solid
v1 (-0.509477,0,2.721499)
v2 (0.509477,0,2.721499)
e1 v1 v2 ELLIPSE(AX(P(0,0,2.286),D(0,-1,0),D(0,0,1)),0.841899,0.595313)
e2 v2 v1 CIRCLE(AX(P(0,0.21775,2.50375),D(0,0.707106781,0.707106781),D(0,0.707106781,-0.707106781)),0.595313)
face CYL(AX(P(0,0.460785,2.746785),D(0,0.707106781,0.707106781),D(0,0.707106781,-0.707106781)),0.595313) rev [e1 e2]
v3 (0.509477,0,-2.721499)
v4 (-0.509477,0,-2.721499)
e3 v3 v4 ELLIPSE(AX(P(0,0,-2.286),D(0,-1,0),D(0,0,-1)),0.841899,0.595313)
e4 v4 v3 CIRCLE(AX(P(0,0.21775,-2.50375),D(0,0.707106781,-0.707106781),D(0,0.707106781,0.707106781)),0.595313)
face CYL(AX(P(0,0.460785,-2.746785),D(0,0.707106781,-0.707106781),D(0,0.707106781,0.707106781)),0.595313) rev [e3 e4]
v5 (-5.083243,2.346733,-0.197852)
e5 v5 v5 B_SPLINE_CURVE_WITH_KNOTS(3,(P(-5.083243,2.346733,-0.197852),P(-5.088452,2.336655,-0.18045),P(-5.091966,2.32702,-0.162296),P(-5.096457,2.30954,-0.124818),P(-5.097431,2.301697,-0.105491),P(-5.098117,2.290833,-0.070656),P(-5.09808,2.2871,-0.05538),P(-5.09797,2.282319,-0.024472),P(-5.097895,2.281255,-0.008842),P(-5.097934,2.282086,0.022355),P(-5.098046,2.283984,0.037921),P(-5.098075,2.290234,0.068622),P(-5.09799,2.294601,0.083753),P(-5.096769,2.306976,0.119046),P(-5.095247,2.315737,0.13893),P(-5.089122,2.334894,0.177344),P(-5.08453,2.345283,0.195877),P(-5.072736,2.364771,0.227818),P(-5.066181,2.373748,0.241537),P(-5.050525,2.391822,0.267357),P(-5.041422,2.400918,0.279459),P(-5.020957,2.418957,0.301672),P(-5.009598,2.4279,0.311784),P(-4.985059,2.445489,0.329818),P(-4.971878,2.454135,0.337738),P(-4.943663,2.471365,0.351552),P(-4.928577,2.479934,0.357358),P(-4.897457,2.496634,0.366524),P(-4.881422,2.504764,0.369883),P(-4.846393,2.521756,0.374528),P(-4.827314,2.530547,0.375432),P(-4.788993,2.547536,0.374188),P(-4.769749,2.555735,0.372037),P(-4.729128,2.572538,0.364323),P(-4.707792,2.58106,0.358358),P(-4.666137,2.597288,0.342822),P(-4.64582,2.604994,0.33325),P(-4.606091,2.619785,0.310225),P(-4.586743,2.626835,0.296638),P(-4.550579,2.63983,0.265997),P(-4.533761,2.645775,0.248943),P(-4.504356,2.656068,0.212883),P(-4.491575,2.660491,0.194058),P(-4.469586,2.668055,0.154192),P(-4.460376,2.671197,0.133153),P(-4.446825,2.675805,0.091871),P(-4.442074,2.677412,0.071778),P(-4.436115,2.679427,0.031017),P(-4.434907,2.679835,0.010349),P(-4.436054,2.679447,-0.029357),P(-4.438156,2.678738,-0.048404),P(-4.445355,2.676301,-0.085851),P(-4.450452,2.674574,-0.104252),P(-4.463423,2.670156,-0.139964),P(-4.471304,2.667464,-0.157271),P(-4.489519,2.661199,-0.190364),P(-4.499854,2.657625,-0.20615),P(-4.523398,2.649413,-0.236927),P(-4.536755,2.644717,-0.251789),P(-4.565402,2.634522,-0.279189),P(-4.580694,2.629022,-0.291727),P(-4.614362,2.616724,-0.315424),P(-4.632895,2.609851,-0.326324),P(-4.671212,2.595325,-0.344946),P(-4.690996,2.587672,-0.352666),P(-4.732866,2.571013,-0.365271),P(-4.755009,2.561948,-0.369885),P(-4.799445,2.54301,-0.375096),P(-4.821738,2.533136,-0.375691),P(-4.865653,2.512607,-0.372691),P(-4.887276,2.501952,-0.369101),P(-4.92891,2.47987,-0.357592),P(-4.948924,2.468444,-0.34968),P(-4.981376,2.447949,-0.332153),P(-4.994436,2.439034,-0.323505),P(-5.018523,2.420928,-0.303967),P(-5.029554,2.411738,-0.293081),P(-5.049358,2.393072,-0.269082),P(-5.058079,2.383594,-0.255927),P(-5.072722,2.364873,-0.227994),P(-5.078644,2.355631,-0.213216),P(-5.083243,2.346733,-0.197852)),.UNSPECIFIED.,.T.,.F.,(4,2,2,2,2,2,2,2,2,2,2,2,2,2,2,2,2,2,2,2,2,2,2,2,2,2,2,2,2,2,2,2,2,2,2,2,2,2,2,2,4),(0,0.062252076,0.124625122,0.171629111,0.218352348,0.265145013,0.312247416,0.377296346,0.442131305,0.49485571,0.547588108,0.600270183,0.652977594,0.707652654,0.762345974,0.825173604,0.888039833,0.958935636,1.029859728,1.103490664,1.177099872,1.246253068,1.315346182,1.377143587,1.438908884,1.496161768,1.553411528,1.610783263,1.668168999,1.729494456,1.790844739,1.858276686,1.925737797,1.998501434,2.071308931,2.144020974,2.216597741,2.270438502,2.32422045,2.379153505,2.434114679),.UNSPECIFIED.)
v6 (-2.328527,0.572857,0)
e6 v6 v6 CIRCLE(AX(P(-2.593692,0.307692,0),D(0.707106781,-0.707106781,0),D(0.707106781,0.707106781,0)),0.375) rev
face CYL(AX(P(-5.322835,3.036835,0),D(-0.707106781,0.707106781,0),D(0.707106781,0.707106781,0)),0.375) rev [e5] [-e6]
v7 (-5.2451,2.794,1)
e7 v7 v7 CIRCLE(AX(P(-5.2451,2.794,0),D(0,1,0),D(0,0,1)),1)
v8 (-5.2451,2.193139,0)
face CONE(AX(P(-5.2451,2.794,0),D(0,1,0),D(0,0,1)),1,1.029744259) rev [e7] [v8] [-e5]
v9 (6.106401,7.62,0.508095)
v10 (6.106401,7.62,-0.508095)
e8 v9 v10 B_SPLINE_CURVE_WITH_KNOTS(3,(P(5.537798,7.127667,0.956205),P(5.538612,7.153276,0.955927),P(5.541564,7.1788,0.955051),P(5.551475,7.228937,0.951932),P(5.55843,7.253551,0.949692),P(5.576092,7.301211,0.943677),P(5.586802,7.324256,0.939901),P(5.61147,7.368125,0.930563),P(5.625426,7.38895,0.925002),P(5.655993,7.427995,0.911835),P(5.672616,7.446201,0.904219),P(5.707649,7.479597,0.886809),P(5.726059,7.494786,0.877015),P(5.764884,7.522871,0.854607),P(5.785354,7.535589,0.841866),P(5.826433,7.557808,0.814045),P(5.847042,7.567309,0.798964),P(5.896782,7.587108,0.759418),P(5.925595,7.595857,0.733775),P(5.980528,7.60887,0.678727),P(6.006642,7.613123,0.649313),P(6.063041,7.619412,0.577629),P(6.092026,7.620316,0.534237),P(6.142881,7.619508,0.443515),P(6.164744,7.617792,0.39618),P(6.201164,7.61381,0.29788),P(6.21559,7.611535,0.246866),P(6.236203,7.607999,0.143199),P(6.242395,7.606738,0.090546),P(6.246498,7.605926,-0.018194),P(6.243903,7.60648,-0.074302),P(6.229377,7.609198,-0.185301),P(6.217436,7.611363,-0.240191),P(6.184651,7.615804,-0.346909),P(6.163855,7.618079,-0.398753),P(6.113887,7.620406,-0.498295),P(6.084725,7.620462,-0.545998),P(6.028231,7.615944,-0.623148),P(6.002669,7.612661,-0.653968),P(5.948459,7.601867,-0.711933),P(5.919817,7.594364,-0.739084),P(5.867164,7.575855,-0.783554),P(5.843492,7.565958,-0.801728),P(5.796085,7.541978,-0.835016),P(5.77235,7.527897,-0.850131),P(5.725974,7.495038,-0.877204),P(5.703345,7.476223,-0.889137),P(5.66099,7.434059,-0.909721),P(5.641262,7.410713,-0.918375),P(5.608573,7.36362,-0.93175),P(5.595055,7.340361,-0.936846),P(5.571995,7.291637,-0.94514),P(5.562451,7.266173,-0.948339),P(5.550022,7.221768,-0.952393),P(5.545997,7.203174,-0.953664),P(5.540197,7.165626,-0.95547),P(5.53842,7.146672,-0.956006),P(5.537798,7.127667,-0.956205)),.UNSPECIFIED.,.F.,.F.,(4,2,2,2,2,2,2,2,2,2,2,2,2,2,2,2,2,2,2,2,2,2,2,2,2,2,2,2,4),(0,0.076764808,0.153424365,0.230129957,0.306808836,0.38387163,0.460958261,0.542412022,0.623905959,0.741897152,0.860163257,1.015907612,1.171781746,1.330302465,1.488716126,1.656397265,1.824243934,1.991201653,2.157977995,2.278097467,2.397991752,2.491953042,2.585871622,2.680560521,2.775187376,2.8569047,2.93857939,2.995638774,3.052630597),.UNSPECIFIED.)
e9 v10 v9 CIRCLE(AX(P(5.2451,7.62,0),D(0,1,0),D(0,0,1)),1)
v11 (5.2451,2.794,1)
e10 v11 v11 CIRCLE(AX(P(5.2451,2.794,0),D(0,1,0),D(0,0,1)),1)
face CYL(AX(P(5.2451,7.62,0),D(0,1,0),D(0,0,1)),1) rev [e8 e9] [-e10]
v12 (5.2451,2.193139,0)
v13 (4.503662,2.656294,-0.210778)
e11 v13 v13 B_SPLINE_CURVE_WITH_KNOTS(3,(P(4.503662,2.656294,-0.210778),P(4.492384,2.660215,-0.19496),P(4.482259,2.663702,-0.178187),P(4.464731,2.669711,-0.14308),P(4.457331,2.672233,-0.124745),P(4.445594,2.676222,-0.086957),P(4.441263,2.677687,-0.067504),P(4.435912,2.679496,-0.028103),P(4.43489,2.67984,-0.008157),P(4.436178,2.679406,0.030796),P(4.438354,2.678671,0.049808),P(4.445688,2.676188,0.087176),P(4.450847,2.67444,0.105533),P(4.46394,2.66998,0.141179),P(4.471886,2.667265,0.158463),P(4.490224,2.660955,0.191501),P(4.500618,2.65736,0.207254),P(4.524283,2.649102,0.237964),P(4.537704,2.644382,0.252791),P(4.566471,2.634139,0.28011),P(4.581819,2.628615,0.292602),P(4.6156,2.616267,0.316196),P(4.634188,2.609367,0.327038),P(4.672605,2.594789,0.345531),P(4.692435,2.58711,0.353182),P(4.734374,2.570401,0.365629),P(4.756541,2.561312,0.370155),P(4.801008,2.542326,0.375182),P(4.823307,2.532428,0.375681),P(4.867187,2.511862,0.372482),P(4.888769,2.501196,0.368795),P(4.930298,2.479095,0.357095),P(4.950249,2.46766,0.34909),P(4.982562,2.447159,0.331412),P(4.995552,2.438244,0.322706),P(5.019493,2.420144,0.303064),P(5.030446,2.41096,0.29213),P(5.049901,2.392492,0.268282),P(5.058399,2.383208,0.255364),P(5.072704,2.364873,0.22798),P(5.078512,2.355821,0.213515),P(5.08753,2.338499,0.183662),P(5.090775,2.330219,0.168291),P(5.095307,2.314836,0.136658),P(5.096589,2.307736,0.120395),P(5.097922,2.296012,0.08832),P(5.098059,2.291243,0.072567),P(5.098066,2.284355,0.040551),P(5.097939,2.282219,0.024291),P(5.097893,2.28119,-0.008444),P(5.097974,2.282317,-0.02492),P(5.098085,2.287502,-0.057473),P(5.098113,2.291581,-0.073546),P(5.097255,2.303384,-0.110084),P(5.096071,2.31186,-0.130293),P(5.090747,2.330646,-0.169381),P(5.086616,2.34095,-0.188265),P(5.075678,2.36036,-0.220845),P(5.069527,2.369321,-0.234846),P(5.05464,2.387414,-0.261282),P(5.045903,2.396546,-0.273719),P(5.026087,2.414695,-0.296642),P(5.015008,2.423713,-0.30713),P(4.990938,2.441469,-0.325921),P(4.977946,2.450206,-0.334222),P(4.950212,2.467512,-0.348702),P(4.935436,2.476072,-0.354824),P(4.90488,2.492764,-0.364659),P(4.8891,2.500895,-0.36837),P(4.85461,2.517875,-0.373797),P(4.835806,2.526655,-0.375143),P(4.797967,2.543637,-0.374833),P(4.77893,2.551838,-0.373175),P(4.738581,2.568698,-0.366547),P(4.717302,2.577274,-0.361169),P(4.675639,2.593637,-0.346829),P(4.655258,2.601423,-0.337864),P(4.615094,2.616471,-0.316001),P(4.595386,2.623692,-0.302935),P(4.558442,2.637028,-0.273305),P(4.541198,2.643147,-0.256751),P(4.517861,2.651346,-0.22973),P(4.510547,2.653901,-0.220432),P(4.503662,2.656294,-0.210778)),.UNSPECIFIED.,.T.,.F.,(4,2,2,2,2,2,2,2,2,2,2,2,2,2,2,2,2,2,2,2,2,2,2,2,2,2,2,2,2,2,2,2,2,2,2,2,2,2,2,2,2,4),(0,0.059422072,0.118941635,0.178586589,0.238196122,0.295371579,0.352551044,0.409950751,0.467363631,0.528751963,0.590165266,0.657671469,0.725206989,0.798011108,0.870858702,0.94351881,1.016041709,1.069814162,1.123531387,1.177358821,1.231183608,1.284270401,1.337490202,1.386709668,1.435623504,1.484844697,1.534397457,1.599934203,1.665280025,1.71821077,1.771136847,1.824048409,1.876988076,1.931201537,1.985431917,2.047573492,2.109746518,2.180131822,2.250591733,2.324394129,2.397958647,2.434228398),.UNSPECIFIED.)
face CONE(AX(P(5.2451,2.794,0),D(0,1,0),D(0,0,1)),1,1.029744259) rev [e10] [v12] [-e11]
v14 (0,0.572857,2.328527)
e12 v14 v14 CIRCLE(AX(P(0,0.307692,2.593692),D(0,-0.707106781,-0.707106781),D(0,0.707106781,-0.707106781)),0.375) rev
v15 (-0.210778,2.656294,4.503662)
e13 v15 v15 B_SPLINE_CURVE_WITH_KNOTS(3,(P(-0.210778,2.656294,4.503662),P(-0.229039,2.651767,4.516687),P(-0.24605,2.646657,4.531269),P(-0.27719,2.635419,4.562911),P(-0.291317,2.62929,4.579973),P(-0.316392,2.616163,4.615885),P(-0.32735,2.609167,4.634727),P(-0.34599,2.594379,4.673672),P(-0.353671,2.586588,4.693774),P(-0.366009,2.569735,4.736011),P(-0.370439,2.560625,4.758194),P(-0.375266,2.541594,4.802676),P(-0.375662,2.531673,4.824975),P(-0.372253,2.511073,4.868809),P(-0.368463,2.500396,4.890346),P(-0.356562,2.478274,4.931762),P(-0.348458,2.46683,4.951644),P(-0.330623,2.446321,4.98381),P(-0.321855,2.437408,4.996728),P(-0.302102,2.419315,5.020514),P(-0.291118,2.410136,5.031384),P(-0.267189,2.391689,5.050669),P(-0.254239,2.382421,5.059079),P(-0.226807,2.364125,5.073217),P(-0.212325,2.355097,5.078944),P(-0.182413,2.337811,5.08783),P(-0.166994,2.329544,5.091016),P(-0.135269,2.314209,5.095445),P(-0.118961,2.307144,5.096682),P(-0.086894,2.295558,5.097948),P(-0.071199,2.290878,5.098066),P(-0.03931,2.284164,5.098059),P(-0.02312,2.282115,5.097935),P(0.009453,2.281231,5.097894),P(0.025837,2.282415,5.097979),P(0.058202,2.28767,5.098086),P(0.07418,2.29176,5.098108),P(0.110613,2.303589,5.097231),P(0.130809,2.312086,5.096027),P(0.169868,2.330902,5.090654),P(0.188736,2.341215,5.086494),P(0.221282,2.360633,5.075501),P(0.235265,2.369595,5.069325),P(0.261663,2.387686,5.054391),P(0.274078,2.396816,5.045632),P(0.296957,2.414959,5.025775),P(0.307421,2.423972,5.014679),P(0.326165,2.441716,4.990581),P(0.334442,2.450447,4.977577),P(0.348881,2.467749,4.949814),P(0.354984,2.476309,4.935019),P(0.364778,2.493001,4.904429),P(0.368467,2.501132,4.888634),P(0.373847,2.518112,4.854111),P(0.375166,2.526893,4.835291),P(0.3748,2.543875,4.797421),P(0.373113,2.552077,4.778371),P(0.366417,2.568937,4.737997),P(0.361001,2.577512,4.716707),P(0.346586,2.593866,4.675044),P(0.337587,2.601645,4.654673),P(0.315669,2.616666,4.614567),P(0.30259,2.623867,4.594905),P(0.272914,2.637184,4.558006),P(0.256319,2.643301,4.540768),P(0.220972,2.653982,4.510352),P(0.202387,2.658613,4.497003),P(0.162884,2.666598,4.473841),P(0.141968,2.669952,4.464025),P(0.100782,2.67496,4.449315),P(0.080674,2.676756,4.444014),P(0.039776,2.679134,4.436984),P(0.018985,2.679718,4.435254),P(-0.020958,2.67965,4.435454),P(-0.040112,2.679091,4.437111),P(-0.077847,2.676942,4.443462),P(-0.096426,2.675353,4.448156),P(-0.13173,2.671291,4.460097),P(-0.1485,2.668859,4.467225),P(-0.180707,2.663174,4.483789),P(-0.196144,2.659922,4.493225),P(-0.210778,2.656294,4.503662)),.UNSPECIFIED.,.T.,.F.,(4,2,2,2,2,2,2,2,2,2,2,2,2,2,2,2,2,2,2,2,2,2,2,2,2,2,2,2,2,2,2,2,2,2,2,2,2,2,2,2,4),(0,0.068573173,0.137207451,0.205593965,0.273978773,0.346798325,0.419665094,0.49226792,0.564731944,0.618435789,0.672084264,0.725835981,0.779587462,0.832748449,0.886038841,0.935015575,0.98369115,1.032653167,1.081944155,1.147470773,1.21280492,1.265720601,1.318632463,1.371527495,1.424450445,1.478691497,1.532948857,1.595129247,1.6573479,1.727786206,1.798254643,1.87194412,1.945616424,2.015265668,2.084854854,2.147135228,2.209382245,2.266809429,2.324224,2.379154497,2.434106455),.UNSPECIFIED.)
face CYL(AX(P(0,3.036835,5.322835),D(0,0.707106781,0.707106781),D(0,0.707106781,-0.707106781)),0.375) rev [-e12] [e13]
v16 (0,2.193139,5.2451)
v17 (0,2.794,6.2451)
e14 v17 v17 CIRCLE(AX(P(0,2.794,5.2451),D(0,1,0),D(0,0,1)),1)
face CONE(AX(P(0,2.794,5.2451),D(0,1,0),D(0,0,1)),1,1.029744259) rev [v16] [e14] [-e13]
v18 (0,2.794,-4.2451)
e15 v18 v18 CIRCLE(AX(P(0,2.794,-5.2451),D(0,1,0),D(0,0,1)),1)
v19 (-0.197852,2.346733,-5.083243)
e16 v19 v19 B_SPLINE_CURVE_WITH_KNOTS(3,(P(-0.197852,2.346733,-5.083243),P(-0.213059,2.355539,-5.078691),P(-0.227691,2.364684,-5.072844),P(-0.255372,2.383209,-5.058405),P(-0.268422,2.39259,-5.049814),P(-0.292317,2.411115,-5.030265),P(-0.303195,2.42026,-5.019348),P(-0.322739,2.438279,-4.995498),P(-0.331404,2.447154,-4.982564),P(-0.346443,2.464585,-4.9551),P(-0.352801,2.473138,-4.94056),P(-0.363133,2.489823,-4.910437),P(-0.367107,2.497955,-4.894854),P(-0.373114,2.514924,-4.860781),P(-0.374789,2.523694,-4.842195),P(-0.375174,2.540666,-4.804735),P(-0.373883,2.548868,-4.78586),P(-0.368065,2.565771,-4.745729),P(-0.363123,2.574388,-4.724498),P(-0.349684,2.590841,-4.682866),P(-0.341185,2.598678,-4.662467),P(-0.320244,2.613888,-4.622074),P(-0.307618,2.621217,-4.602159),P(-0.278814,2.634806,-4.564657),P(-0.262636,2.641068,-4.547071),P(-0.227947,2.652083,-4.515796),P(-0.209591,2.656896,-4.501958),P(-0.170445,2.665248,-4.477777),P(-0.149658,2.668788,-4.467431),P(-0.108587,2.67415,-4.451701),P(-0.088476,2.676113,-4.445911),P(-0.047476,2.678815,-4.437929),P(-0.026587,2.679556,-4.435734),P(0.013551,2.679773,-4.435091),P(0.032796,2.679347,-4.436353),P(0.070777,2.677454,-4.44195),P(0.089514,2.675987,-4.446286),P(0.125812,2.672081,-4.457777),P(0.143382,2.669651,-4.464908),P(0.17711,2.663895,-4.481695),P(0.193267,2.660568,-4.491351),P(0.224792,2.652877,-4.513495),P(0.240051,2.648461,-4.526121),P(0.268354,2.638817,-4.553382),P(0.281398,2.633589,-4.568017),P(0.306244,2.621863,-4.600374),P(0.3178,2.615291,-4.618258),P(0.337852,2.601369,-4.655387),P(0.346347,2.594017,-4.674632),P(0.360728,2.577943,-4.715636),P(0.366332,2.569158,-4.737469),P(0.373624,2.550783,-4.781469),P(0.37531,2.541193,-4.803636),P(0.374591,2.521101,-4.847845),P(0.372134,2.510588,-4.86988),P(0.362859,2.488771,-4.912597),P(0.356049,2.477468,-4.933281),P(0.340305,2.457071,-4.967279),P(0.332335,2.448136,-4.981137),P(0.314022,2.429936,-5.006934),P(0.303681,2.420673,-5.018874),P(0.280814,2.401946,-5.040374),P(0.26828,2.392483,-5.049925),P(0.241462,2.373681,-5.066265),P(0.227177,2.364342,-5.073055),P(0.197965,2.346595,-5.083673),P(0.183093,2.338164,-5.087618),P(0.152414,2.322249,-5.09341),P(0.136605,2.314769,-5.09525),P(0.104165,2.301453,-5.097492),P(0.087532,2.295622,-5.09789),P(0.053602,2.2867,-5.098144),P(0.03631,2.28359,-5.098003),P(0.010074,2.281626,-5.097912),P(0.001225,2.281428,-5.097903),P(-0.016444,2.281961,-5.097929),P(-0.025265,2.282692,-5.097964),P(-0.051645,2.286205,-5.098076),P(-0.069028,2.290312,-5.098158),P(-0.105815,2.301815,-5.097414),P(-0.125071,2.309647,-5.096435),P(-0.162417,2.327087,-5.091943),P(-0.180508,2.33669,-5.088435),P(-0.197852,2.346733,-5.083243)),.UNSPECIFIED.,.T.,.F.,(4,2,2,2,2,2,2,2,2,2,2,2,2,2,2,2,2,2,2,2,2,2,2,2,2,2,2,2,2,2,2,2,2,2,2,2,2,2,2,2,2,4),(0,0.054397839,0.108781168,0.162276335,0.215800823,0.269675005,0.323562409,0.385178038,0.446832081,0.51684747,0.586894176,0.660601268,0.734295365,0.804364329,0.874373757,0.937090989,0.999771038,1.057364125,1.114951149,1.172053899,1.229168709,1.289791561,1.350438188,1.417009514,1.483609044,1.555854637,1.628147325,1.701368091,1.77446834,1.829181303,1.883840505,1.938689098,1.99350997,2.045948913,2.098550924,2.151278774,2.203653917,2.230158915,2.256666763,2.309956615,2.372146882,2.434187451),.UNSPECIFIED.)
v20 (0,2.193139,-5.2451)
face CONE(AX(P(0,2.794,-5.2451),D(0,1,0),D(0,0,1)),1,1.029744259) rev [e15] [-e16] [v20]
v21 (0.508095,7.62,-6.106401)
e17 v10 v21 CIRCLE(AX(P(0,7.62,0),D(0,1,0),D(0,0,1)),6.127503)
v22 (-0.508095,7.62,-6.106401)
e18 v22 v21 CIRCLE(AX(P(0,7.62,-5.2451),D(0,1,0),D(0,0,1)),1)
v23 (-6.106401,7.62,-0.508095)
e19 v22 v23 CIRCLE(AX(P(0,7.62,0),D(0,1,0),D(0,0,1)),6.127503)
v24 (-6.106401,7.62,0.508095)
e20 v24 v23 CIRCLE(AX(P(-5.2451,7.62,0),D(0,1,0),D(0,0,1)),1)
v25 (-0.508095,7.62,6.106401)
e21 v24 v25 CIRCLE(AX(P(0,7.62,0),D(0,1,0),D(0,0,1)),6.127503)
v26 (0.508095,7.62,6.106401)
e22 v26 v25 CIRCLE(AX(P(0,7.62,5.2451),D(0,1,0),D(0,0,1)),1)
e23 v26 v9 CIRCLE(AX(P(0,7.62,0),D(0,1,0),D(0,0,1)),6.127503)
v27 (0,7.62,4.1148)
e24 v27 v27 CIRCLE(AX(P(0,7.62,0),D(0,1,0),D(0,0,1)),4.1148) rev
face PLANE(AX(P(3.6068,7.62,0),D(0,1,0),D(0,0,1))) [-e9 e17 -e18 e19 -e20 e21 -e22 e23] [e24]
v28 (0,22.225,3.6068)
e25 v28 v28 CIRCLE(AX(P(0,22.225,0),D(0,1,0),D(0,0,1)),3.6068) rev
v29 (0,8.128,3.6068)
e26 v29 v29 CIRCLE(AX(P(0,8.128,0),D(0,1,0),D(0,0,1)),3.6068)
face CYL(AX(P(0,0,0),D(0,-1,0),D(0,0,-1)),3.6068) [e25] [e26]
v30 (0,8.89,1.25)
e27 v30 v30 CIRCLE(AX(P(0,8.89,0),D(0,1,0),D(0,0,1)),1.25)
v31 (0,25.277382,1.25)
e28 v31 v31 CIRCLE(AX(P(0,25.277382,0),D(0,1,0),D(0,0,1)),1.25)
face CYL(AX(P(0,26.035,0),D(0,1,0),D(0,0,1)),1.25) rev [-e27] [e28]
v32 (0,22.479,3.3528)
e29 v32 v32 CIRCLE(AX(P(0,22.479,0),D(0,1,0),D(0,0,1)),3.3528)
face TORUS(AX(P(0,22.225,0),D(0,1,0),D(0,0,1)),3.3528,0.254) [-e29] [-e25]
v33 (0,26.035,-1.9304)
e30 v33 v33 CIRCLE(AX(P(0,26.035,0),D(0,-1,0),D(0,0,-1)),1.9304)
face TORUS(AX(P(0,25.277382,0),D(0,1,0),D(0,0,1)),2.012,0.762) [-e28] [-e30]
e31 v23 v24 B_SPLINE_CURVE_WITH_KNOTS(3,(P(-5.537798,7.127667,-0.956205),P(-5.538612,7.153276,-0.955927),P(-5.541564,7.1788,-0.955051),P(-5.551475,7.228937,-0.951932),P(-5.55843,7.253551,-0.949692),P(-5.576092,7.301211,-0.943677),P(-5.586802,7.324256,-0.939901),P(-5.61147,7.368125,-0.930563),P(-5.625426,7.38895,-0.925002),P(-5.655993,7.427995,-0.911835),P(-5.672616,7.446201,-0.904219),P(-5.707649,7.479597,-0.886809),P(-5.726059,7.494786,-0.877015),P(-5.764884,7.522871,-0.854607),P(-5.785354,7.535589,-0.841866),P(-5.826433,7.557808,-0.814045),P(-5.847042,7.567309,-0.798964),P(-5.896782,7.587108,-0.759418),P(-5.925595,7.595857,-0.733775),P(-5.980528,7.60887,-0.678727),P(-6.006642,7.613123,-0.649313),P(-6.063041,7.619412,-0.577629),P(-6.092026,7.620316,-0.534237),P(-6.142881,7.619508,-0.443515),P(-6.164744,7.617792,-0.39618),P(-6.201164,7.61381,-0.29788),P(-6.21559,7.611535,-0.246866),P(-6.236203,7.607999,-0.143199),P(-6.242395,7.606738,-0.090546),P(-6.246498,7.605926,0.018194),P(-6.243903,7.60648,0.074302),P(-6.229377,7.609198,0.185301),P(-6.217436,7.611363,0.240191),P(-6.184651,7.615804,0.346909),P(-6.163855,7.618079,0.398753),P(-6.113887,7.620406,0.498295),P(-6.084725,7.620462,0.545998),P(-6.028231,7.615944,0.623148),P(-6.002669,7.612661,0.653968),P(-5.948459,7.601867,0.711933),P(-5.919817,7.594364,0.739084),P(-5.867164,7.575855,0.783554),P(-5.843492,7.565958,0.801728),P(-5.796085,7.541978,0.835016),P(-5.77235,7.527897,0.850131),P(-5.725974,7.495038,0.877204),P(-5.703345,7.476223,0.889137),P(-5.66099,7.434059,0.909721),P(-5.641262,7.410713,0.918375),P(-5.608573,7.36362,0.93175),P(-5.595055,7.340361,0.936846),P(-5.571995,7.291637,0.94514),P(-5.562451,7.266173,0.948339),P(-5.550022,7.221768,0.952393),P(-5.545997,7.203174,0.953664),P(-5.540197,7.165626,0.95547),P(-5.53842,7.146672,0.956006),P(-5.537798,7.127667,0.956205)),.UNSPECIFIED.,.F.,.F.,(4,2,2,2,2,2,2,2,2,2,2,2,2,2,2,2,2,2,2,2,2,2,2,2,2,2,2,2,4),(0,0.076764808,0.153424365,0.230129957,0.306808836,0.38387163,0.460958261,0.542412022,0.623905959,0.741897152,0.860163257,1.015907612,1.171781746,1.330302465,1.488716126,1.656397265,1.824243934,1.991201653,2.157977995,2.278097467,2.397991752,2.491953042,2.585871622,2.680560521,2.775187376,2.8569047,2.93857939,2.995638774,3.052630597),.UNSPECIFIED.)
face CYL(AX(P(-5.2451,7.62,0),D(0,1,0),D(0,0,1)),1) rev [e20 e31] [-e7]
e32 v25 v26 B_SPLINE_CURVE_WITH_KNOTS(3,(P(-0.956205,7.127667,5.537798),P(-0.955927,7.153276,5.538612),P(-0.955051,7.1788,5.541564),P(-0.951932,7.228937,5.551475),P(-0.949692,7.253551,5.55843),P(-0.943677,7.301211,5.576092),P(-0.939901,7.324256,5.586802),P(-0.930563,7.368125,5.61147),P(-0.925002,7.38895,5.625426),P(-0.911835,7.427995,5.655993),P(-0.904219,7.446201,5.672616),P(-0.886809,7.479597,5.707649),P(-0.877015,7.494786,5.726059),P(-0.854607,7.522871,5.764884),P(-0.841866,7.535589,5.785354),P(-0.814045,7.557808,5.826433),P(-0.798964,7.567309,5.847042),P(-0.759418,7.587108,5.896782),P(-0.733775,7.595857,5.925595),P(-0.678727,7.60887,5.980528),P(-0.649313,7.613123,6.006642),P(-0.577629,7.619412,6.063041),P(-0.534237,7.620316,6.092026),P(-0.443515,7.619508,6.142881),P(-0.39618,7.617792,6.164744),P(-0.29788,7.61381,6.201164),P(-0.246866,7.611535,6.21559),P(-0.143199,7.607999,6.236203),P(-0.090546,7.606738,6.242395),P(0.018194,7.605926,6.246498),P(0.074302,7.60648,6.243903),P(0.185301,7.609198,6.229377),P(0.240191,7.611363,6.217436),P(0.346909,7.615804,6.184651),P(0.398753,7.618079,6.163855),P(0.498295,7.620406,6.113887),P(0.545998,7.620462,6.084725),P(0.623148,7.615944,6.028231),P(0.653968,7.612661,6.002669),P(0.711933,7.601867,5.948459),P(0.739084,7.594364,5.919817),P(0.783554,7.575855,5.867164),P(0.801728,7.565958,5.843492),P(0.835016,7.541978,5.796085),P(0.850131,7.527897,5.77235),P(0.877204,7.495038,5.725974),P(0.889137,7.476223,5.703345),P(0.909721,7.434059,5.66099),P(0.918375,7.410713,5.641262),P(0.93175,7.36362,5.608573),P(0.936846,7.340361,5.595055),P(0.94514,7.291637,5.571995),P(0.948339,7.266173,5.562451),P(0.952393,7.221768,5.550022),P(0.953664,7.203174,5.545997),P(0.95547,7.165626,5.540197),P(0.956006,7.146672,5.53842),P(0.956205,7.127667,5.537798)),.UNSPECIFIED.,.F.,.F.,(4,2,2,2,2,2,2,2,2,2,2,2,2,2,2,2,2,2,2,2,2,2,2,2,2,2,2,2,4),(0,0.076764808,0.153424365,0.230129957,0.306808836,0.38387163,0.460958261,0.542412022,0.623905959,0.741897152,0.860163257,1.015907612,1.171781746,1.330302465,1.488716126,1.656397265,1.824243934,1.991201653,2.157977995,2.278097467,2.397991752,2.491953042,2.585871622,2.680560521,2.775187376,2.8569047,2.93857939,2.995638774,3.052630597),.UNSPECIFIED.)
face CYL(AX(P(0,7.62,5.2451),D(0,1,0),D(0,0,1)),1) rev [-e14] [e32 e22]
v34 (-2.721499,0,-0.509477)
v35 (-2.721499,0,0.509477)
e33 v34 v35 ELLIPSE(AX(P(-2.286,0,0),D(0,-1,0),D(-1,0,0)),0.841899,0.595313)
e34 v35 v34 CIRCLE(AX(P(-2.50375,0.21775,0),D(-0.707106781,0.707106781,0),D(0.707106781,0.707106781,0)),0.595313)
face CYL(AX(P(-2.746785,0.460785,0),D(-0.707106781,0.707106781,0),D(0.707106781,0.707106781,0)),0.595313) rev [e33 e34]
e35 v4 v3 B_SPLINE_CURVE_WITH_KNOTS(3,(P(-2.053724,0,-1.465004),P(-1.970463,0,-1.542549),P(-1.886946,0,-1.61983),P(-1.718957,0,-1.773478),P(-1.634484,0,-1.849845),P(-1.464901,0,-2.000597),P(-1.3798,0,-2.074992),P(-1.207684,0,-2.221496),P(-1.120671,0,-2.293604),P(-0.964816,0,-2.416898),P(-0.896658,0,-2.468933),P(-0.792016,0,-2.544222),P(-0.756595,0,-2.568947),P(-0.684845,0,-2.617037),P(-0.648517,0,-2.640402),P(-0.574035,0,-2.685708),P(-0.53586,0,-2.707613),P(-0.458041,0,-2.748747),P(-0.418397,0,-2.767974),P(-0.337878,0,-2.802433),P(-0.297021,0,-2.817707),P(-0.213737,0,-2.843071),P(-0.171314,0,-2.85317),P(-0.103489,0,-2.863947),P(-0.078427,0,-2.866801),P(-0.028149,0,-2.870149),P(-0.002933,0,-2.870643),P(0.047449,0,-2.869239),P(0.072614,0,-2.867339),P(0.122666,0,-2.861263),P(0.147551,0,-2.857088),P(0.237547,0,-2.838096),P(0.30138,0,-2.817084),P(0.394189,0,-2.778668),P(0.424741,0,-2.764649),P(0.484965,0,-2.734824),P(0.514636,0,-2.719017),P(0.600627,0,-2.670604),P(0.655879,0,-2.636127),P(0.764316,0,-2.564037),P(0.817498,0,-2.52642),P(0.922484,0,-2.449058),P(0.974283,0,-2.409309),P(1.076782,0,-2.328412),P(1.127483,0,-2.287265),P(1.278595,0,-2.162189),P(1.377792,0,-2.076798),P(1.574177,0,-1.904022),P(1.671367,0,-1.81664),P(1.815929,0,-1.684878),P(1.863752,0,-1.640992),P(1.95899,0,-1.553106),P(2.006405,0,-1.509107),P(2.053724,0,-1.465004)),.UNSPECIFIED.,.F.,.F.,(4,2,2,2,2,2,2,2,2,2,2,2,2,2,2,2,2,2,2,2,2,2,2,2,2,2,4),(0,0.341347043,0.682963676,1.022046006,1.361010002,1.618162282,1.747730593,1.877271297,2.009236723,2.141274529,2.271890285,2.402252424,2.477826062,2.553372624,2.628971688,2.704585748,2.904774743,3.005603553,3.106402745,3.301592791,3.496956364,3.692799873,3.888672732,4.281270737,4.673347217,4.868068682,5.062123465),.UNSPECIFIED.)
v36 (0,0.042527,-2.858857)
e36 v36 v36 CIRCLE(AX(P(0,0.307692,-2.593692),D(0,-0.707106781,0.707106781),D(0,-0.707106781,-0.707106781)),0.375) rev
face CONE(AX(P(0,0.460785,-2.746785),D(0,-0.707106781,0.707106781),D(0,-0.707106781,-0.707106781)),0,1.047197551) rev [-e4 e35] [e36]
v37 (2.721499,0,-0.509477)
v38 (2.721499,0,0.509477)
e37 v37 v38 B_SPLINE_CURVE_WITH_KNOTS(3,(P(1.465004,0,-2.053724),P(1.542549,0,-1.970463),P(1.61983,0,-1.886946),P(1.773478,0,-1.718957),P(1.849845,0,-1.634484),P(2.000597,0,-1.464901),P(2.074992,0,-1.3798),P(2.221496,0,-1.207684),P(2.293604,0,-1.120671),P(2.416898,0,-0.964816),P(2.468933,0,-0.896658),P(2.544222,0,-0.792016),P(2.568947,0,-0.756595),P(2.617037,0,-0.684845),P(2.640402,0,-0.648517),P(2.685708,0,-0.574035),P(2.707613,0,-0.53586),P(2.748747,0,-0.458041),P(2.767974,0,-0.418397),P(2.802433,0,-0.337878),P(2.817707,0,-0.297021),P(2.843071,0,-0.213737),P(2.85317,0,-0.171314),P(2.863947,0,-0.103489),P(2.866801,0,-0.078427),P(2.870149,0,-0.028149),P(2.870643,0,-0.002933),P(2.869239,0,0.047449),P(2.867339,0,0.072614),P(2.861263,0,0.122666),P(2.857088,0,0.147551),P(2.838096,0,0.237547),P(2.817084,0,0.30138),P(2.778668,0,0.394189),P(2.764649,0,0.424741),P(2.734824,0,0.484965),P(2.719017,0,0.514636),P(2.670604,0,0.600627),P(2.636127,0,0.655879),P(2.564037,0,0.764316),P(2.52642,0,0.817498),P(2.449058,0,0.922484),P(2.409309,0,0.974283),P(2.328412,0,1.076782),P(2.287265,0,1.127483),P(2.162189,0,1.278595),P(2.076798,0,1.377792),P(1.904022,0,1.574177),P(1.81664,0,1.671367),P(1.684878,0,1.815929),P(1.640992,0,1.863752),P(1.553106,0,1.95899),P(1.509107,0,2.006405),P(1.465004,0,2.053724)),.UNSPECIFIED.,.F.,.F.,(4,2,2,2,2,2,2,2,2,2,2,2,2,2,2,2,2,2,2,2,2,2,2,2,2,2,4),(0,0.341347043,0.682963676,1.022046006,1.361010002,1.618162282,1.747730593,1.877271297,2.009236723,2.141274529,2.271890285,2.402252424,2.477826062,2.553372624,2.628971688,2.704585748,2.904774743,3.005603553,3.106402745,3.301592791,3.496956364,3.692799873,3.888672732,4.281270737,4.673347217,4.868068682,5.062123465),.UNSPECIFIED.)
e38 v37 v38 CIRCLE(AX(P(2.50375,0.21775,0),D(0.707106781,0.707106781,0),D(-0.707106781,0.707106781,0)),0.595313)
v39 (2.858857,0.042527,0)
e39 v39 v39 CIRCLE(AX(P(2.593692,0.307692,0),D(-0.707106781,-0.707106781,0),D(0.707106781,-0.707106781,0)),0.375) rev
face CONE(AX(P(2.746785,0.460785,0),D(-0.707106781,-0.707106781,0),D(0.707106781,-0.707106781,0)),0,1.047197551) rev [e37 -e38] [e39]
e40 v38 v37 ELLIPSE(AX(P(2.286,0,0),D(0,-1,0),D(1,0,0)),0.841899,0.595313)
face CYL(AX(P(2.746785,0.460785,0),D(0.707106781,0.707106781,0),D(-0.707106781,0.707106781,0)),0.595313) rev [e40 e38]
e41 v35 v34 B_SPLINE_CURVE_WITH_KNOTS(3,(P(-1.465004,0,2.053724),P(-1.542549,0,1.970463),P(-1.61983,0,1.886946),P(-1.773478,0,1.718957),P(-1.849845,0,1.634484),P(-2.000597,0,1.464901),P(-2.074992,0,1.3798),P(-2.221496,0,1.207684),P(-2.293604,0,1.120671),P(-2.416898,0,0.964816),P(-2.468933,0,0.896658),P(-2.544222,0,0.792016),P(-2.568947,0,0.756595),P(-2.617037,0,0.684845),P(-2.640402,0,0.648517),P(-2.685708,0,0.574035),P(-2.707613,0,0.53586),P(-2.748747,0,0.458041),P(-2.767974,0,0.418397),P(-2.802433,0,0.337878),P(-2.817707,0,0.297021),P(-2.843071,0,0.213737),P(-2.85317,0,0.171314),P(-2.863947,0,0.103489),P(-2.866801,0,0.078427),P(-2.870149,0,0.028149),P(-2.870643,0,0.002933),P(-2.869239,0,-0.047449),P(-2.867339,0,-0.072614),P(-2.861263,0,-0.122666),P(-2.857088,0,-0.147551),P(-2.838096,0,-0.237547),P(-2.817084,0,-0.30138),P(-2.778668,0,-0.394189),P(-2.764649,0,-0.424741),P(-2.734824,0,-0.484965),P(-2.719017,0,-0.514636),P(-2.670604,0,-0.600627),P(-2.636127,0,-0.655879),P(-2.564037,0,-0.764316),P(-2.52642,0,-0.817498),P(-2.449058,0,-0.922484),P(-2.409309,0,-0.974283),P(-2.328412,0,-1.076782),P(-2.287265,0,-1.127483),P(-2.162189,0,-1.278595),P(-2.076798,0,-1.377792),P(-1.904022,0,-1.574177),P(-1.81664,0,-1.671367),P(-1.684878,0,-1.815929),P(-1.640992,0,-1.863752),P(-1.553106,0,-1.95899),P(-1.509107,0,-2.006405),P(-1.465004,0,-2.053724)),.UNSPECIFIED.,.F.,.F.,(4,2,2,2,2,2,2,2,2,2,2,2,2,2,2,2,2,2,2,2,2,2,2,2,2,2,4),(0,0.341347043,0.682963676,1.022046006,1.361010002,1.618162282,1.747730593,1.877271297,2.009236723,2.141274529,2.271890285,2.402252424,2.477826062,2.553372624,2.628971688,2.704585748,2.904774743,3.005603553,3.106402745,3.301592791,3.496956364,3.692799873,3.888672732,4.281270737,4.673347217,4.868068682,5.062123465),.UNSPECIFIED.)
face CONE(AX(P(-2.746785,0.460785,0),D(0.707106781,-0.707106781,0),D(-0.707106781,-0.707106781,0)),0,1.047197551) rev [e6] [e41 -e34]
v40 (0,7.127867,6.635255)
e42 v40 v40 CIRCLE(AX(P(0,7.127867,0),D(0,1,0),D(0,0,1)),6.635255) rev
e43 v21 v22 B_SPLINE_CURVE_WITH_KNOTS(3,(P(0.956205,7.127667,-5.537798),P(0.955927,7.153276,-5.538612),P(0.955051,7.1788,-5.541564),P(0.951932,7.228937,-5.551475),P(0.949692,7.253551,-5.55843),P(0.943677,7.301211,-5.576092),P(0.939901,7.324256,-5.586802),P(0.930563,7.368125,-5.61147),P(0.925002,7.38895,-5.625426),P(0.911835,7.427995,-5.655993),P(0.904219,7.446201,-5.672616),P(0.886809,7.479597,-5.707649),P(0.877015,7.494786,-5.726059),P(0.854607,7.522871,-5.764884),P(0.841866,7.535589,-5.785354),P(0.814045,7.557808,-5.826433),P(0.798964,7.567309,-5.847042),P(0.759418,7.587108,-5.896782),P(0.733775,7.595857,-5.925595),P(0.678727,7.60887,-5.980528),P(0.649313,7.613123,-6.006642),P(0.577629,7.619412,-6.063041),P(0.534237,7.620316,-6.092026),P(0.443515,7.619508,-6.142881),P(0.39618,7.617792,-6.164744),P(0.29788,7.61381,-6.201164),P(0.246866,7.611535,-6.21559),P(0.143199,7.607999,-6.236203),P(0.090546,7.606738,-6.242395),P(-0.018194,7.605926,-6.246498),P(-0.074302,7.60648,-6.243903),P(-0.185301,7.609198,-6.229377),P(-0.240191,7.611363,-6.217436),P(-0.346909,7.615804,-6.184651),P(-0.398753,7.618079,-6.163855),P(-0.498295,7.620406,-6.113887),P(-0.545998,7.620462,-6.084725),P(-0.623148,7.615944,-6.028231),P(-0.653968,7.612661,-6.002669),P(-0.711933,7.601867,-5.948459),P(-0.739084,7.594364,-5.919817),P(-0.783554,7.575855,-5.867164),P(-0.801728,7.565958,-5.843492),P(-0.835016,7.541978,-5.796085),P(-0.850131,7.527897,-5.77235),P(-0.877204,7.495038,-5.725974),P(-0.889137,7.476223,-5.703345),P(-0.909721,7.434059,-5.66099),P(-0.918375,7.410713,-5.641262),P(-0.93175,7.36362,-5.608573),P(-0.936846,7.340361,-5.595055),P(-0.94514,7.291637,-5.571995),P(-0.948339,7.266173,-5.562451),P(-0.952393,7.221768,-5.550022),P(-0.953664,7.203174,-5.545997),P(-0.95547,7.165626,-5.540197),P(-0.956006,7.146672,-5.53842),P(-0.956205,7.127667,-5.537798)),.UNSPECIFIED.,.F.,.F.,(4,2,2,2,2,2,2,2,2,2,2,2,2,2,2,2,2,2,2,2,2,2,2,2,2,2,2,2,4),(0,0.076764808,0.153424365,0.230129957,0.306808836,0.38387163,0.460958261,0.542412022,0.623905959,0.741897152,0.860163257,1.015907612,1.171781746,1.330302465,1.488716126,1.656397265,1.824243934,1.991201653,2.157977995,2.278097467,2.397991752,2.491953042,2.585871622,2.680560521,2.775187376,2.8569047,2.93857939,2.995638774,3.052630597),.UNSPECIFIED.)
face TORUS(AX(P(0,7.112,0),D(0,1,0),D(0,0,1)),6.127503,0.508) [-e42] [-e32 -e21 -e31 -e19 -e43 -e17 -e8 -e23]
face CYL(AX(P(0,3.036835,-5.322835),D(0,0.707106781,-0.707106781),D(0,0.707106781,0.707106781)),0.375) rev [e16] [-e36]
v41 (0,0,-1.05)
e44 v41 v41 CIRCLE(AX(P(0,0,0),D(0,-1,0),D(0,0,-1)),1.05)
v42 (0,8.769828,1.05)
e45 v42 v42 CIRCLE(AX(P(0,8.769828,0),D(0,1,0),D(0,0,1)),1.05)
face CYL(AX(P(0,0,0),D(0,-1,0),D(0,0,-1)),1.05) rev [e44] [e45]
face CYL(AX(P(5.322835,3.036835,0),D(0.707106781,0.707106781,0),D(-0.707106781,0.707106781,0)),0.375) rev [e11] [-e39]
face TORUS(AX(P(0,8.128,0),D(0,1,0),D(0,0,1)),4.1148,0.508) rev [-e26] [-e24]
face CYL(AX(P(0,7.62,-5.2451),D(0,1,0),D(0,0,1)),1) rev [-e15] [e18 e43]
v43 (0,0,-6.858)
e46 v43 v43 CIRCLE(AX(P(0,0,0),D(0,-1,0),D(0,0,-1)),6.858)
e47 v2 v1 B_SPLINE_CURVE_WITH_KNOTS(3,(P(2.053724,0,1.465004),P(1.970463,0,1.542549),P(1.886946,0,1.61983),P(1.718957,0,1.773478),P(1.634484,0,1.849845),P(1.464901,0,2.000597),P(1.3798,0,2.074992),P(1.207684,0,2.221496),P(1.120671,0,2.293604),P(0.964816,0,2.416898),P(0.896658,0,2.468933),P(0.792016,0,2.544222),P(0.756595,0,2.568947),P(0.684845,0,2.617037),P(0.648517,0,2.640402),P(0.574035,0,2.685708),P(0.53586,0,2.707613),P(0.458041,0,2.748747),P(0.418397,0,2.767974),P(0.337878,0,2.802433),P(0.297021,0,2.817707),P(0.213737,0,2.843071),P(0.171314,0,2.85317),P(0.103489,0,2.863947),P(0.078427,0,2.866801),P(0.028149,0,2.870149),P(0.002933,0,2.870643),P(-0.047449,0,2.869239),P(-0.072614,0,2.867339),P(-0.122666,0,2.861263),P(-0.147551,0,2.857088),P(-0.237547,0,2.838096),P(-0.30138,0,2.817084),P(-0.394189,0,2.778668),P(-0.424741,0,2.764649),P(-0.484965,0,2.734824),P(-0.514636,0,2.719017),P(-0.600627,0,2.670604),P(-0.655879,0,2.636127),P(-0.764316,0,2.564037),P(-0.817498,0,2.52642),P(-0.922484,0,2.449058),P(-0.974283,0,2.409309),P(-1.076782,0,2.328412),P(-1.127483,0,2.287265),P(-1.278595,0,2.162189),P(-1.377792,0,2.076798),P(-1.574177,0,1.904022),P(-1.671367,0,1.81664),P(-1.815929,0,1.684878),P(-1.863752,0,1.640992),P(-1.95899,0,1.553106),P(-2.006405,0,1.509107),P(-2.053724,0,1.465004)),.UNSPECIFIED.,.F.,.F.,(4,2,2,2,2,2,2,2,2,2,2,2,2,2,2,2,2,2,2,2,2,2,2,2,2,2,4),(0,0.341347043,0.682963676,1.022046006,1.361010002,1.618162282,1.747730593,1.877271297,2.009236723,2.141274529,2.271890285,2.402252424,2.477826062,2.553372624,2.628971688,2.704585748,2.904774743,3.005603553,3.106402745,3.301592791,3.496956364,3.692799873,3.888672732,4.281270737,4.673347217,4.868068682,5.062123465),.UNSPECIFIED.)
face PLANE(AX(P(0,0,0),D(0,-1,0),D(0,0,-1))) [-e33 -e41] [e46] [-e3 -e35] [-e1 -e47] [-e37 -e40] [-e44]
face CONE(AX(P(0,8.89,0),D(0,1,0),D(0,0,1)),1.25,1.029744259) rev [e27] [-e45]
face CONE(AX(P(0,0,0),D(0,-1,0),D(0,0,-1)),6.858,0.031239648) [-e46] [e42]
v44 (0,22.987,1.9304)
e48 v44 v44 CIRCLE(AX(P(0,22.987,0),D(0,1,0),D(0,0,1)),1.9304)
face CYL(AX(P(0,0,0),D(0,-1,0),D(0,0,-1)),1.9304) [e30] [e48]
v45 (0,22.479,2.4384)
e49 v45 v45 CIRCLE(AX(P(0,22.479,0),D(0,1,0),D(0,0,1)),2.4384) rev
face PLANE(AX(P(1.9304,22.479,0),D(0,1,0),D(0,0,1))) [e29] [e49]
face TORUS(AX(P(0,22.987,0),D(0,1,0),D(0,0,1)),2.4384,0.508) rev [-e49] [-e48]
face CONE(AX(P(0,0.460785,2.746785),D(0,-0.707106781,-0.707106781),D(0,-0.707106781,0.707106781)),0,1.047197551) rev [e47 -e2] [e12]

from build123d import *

# Parameters (mm, degrees)
LARGE_RADII_R                 = 0.508
SMALL_OD_RADII_R              = 0.254
F_42_0_0935_LOX_INLET_D       = 2.1
F_42_0_0935_LOX_INLET_DEPTH   = 8.89
F_42_0_0935_LOX_INLET_TIP     = 0.6309036499789383
F_1_8_0_125_LOX_LEAD_IN_D     = 2.5
F_1_8_0_125_LOX_LEAD_IN_DEPTH = 17.145
F_1_8_0_125_LOX_LEAD_IN_TIP   = 0.7510757737844503
CIRPATTERN1_COUNT             = 4
FILLET1_R                     = 0.762


with BuildPart() as part:
    # Sketch2 → Revolve1 (revolve)
    with BuildSketch(Plane.XY, mode=Mode.PRIVATE) as revolve1_sk:
        Polygon((0, 0), (6.8580000000000005, 0), (6.619876412211779, 7.619999999999999), (3.606800000000001, 7.619999999999999), (3.6067999999999993, 22.478999999999996), (1.9304000000000003, 22.478999999999996), (1.9304000000000003, 26.034999999999997), (-2e-17, 26.034999999999997), align=None)
    revolve(revolve1_sk.sketch.rotate(Axis((0, 0, 0), (0, 1, 0)), 90), axis=Axis((0, 0, 0), (0, 1, 0)))

    # Large Radii
    large_radii_edges = [part.edges().sort_by_distance(p)[0] for p in [
        (-1.31e-15, 22.478999999999996, 1.9304000000000003),
        (-8.4e-16, 7.619999999999999, 3.606800000000001),
        (-1.55e-15, 7.619999999999999, 6.619876412211779),
    ]]
    fillet(large_radii_edges, radius=LARGE_RADII_R)

    # Small OD Radii
    small_od_radii_edges = [part.edges().sort_by_distance(p)[0] for p in [
        (-8.4e-16, 22.478999999999996, 3.6067999999999993),
    ]]
    fillet(small_od_radii_edges, radius=SMALL_OD_RADII_R)

    # #42 (0.0935) LOX Inlet
    with Locations(Plane.XZ):
        with Locations((0, 0)):
            Hole(F_42_0_0935_LOX_INLET_D / 2, depth=F_42_0_0935_LOX_INLET_DEPTH)
            with Locations((0, 0, -(F_42_0_0935_LOX_INLET_DEPTH + F_42_0_0935_LOX_INLET_TIP / 2))):  # 118° drill point
                Cone(0, F_42_0_0935_LOX_INLET_D / 2, F_42_0_0935_LOX_INLET_TIP, mode=Mode.SUBTRACT)

    # 1/8 (0.125) LOX Lead-in
    with Locations(Plane(origin=(0, 26.034999999999997, 0), x_dir=(1, 0, 0), z_dir=(0, 1, 0))):
        with Locations((0, 0)):
            Hole(F_1_8_0_125_LOX_LEAD_IN_D / 2, depth=F_1_8_0_125_LOX_LEAD_IN_DEPTH)
            with Locations((0, 0, -(F_1_8_0_125_LOX_LEAD_IN_DEPTH + F_1_8_0_125_LOX_LEAD_IN_TIP / 2))):  # 118° drill point
                Cone(0, F_1_8_0_125_LOX_LEAD_IN_D / 2, F_1_8_0_125_LOX_LEAD_IN_TIP, mode=Mode.SUBTRACT)

    # Sketch16 → Ø2.0 (2) Diameter Hole2 (revolve, cut)
    with BuildSketch(Plane(origin=(5.245100000000001, 7.619999999999999, 0), x_dir=(0, 0, 1), z_dir=(1, 0, 0))):
        Polygon((0, 0), (-1.33e-15, 5.426860619027559), (0.9999999999999986, 4.825999999999999), (0.9999999999999888, -1.43e-15), align=None)
    f_2_0_2_diameter_hole2 = revolve(axis=Axis((5.245100000000001, 13.96999999999999, 0), (0, -1, 0)), mode=Mode.SUBTRACT)

    # Sketch11 → Fuel Hole (revolve, cut)
    with BuildSketch(Plane.XY, mode=Mode.PRIVATE) as fuel_hole_sk:
        Polygon((2.2860000000000382, -0.5303301028604733), (5.587999999999999, 2.77166989713949), (5.322834948569763, 3.0368349485697266), (2.0208349485698007, -0.26516505143023533), align=None)
    fuel_hole = revolve(fuel_hole_sk.sketch.rotate(Axis((5.322834948569763, 3.0368349485697266, 0), (-0.7071067811865476, -0.7071067811865476, 0)), 214.199192908), axis=Axis((5.322834948569763, 3.0368349485697266, 0), (-0.7071067811865476, -0.7071067811865476, 0)), mode=Mode.SUBTRACT)

    # Sketch12 → Fuel Spot Drill (revolve, cut)
    with BuildSketch(Plane.XY, mode=Mode.PRIVATE) as fuel_spot_drill_sk:
        Polygon((2.7467848160919206, 0.46078481609188404), (2.0828000000000366, 0.6386990113502337), (1.2409009886498032, -0.20320000000000016), (1.66185049432492, -0.6241495056751171), align=None)
    fuel_spot_drill = revolve(fuel_spot_drill_sk.sketch.rotate(Axis((2.7467848160919206, 0.46078481609188404, 0), (-0.7071067811865475, -0.7071067811865477, 0)), 34.199192908), axis=Axis((2.7467848160919206, 0.46078481609188404, 0), (-0.7071067811865475, -0.7071067811865477, 0)), mode=Mode.SUBTRACT)

    # CirPattern1: Ø2.0 (2) Diameter Hole2, Fuel Hole, Fuel Spot Drill ×4 about axis
    cirpattern1_axis = Axis((0, 0, 9.16e-15), (0, 1, 0))
    add([f_2_0_2_diameter_hole2.rotate(cirpattern1_axis, i * 360 / CIRPATTERN1_COUNT) for i in range(1, CIRPATTERN1_COUNT)], mode=Mode.SUBTRACT)
    add([fuel_hole.rotate(cirpattern1_axis, i * 360 / CIRPATTERN1_COUNT) for i in range(1, CIRPATTERN1_COUNT)], mode=Mode.SUBTRACT)
    add([fuel_spot_drill.rotate(cirpattern1_axis, i * 360 / CIRPATTERN1_COUNT) for i in range(1, CIRPATTERN1_COUNT)], mode=Mode.SUBTRACT)

    # Fillet1
    # the kernel refuses this fillet: 0.762 mm, written as the material it takes off along each edge
    with BuildSketch(Plane(origin=(0, 26.034999999999997, 0), x_dir=(-1, 0, 0), z_dir=(0, 0, 1))) as fillet1_piece_1:
        with BuildLine():
            CenterArc((2.012, 0.75761826799517), FILLET1_R, 180, 83.85260130416106)
            Line((1.25, 0.75761826799517), (1.23476, 0.75761826799517))
            Line((1.23476, 0.75761826799517), (1.23476, 0))
            Line((1.23476, 0), (1.25, -0.01523999999999859))
            ThreePointArc((1.25, -0.01523999999999859), (1.5902000000000003, -0.01523999999999859), (1.9287680000000003, -0.01515236535990283))
            Line((1.9287680000000003, -0.01515236535990283), (1.9304000000000003, 0))
        make_face()
    revolve(axis=Axis((0, 26.034999999999997, 0), (0, -1, 0)), mode=Mode.SUBTRACT)


solid = part.part
